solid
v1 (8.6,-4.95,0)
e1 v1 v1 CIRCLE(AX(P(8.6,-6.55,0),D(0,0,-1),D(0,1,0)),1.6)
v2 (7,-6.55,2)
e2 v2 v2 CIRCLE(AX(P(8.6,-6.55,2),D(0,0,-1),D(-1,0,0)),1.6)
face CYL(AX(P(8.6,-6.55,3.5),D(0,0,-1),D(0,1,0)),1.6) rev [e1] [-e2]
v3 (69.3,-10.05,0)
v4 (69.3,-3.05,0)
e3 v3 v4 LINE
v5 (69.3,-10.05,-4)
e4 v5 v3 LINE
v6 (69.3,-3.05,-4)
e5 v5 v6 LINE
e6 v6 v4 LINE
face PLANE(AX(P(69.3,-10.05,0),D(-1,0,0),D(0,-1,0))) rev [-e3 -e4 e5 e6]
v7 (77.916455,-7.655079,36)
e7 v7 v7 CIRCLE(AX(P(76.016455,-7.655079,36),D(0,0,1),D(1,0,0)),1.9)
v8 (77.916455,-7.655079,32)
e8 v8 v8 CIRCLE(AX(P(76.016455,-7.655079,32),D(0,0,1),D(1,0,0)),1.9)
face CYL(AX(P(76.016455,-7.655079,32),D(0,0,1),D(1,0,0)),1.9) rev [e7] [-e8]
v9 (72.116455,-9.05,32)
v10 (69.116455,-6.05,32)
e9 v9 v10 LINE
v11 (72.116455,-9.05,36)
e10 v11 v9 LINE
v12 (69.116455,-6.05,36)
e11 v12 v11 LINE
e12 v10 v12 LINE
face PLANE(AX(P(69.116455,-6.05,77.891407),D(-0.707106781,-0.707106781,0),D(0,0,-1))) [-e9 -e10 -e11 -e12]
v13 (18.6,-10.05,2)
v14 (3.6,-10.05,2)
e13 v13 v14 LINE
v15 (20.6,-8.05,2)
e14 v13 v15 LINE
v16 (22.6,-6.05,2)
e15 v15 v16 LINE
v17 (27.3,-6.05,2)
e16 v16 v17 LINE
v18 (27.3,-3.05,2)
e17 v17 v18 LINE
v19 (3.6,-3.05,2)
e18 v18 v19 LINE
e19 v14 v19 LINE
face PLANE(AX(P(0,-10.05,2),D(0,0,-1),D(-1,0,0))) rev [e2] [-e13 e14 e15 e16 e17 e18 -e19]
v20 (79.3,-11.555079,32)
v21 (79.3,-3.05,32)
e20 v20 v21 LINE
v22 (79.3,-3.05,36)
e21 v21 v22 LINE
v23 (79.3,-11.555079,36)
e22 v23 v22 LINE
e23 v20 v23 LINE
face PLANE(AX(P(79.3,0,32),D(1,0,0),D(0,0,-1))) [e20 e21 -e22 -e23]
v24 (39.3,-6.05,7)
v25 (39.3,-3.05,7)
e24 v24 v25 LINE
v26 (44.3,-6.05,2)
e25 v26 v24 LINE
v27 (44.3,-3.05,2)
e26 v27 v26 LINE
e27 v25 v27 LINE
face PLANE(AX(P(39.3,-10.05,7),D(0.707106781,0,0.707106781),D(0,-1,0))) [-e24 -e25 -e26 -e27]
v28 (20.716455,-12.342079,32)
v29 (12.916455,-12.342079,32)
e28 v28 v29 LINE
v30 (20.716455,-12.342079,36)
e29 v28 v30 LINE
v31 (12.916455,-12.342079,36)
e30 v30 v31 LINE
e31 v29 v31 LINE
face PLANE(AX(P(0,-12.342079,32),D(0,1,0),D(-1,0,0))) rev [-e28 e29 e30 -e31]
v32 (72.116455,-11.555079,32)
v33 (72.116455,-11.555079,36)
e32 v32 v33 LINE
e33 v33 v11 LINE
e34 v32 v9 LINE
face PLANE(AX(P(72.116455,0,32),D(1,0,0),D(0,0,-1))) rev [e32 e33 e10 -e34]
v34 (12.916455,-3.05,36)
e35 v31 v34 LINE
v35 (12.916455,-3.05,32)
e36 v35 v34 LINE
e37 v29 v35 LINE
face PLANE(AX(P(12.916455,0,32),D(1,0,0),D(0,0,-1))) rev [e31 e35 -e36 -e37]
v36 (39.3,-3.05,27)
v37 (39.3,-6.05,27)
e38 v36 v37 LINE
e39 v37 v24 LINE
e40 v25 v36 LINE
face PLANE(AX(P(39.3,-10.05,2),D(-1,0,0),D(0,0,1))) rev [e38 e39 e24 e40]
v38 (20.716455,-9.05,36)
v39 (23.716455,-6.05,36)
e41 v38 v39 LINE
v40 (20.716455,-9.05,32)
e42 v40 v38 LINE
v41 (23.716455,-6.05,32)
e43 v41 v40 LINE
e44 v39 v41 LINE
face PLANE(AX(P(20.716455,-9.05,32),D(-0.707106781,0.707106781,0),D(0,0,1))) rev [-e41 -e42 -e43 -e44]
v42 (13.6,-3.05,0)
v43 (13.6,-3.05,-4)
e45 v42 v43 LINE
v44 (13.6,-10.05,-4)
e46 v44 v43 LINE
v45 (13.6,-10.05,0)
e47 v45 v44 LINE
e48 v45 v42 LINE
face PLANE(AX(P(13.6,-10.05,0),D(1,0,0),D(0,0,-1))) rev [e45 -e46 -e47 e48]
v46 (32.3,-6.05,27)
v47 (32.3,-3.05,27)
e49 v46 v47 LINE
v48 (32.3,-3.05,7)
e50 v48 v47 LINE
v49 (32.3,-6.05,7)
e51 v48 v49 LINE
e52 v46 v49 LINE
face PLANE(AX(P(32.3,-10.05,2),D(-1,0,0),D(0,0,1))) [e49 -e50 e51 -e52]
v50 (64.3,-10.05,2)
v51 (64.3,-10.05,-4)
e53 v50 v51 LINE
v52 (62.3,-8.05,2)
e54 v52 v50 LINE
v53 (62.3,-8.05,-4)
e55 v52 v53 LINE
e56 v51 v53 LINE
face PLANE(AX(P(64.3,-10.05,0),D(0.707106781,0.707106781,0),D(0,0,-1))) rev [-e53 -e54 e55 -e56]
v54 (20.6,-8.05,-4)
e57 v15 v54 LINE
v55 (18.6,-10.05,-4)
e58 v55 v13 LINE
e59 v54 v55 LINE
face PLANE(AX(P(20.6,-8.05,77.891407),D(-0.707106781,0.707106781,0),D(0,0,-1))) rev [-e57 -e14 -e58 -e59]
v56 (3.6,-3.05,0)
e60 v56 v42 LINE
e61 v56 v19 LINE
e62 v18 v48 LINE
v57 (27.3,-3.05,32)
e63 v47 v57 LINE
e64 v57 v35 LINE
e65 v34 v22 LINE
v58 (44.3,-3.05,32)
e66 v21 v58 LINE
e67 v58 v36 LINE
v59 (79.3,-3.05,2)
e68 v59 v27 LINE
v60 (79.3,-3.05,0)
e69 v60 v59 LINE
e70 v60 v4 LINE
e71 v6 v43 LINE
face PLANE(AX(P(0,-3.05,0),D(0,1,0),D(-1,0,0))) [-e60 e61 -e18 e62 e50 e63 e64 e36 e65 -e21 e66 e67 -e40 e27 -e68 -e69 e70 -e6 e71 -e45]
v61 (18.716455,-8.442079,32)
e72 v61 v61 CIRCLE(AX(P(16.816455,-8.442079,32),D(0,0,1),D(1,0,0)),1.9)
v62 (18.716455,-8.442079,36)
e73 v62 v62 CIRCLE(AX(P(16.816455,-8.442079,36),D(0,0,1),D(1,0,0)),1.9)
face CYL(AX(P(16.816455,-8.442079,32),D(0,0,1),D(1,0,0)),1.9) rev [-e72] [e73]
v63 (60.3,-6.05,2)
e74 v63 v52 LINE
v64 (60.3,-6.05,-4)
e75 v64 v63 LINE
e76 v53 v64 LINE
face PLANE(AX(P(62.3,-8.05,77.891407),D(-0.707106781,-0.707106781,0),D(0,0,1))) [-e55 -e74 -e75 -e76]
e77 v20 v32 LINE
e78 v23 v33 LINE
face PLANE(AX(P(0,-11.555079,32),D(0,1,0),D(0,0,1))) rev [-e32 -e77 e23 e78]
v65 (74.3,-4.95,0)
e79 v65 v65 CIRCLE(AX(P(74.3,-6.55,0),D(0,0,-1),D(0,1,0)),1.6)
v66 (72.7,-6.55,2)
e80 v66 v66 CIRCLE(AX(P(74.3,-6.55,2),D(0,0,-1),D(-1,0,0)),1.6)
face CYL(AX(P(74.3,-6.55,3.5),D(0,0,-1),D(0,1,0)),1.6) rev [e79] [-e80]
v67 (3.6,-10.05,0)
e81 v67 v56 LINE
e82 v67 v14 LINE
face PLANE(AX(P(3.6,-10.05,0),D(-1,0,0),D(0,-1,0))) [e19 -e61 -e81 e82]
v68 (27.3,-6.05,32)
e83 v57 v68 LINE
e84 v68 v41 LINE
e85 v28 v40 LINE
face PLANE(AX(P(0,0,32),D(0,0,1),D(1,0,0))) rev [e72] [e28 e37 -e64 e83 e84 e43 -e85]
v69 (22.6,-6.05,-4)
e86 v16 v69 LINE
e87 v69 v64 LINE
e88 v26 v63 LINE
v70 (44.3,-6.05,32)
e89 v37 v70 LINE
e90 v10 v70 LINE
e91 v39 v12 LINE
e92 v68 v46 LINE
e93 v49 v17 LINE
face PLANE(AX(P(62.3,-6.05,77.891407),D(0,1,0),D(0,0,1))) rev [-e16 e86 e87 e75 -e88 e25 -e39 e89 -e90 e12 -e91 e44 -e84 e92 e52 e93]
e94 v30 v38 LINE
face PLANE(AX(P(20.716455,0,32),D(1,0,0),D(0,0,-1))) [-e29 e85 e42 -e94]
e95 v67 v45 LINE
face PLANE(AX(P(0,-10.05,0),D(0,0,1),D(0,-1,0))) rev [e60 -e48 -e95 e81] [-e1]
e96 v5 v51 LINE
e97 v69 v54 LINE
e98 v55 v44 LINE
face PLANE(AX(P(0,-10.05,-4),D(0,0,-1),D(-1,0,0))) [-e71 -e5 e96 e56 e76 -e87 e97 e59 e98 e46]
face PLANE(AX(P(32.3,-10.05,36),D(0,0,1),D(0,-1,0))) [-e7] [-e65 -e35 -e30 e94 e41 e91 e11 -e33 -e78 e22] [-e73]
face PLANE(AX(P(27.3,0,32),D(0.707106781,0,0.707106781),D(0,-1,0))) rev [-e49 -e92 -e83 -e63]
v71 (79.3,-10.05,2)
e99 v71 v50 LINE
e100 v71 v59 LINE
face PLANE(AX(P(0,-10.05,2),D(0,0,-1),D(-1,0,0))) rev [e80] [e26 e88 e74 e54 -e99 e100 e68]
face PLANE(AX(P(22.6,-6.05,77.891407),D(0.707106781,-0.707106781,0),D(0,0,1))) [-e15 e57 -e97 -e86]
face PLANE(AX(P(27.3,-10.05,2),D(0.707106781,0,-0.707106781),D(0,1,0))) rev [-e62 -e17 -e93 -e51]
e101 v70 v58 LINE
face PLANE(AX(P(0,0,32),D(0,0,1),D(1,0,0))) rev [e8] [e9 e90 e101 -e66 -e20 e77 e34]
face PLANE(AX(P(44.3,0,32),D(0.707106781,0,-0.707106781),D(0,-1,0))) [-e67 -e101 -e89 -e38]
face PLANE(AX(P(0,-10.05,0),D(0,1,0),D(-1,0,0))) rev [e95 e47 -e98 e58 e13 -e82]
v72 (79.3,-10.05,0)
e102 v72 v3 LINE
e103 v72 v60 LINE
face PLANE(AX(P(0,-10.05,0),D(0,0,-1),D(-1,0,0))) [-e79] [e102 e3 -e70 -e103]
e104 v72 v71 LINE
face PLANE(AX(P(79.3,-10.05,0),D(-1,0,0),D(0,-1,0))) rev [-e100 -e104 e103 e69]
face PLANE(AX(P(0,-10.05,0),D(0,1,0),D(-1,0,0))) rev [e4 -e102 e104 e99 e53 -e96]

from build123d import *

# Parameters (mm, degrees)
SKETCH2_W           = 10
SKETCH2_H           = 2
SKETCH2_W_2         = 7
SKETCH2_H_2         = 34
BOSS_EXTRUDE1_DEPTH = 7
CUT_EXTRUDE1_REACH  = 91.384
SKETCH4_W           = 41.7
SKETCH4_H           = 4
SKETCH6_W           = 11.583545394
SKETCH6_H           = 3
SKETCH6_W_2         = 32.816454606
SKETCH6_W_3         = 7.183545394
SKETCH6_H_2         = 8.505079478
SKETCH6_R           = 1.9
SKETCH6_W_4         = 7.8
SKETCH6_H_3         = 9.292079478
BOSS_EXTRUDE2_DEPTH = 4
CHAMFER1_SIZE       = 5
CHAMFER2_SIZE       = 3
CHAMFER7_SIZE       = 2
SKETCH7_R           = 1.6
CUT_EXTRUDE2_DEPTH  = 3.5


with BuildPart() as part:
    # Sketch2 → Boss-Extrude1 (new body)
    with BuildSketch(Plane(origin=(0, -3.05, 0), x_dir=(1, 0, 0), z_dir=(0, 1, 0))):
        with Locations((74.3, -1)):
            Rectangle(SKETCH2_W, SKETCH2_H)
        Polygon((69.3, -2), (69.3, 0), (69.3, 4), (13.6, 4), (13.6, 0), (13.6, -2), (32.3, -2), (39.3, -2), align=None)
        with Locations((35.8, -19)):
            Rectangle(SKETCH2_W_2, SKETCH2_H_2)
        with Locations((8.6, -1)):
            Rectangle(SKETCH2_W, SKETCH2_H)
    extrude(amount=-BOSS_EXTRUDE1_DEPTH)

    # Cut-Extrude1: up to this face of the body (flat: up to its plane)
    cut_extrude1_end = Plane(part.part.faces().sort_by_distance((35.8, -6.55, 36))[0])
    # Sketch4 → Cut-Extrude1 (cut, up to the picked face)
    with BuildSketch(Plane(origin=(0, 0, -4), x_dir=(-1, 0, 0), z_dir=(0, 0, -1)), mode=Mode.PRIVATE) as cut_extrude1_sk1:
        with Locations((-41.45, -8.05)):
            Rectangle(SKETCH4_W, SKETCH4_H)
    cut_extrude1_tool1 = split(extrude(cut_extrude1_sk1.sketch, amount=-CUT_EXTRUDE1_REACH, mode=Mode.PRIVATE), bisect_by=cut_extrude1_end, keep=Keep.BOTH, mode=Mode.PRIVATE)
    add(cut_extrude1_tool1.solids().sort_by(Axis((41.45, -8.05, -4), (0, 0, 1)))[0], mode=Mode.SUBTRACT)

    # Sketch6 → Boss-Extrude2 (add)
    # profile 1 of 4: a face of its own
    with BuildSketch(Plane.XY.offset(36)):
        with Locations((26.508227303, -4.55)):
            Rectangle(SKETCH6_W, SKETCH6_H)
    # profile 2 of 4: a face of its own
    with BuildSketch(Plane.XY.offset(36)):
        with Locations((55.708227303, -4.55)):
            Rectangle(SKETCH6_W_2, SKETCH6_H)
    # profile 3 of 4: a face of its own
    with BuildSketch(Plane.XY.offset(36)):
        with Locations((75.708227303, -7.302539739)):
            Rectangle(SKETCH6_W_3, SKETCH6_H_2)
        with Locations((76.016454606, -7.655079478)):
            Circle(SKETCH6_R, mode=Mode.SUBTRACT)
    # profile 4 of 4: a face of its own
    with BuildSketch(Plane.XY.offset(36)):
        with Locations((16.816454606, -7.696039739)):
            Rectangle(SKETCH6_W_4, SKETCH6_H_3)
        with Locations((16.816454606, -8.442079478)):
            Circle(SKETCH6_R, mode=Mode.SUBTRACT)
    extrude(amount=-BOSS_EXTRUDE2_DEPTH)

    # Chamfer1
    chamfer1_edges = [part.edges().sort_by_distance(p)[0] for p in [
        (39.3, -4.55, 2),
        (32.3, -4.55, 2),
        (39.3, -4.55, 32),
        (32.3, -4.55, 32),
    ]]
    chamfer(chamfer1_edges, length=CHAMFER1_SIZE)

    # Chamfer2
    chamfer2_edges = [part.edges().sort_by_distance(p)[0] for p in [
        (72.116454606, -6.05, 34),
        (20.716454606, -6.05, 34),
    ]]
    chamfer(chamfer2_edges, length=CHAMFER2_SIZE)

    # Chamfer7
    chamfer7_edges = [part.edges().sort_by_distance(p)[0] for p in [
        (62.3, -6.05, -1),
        (20.6, -6.05, -1),
    ]]
    chamfer(chamfer7_edges, length=CHAMFER7_SIZE)
    chamfer7_2_edges = [part.edges().sort_by_distance(p)[0] for p in [
        (62.3, -10.05, -1),
        (20.6, -10.05, -1),
    ]]
    chamfer(chamfer7_2_edges, length=CHAMFER7_SIZE - 0.0001)  # a hair under: the kernel refuses the full size

    # Sketch7 → Cut-Extrude2 (cut)
    with BuildSketch(Plane(origin=(0, 0, 0), x_dir=(-1, 0, 0), z_dir=(0, 0, -1))):
        with Locations(Location((-74.3, -6.55, 0), (0, 0, 90))):
            Circle(SKETCH7_R)
        with Locations(Location((-8.6, -6.55, 0), (0, 0, 90))):
            Circle(SKETCH7_R)
    extrude(amount=-CUT_EXTRUDE2_DEPTH, mode=Mode.SUBTRACT)


solid = part.part
